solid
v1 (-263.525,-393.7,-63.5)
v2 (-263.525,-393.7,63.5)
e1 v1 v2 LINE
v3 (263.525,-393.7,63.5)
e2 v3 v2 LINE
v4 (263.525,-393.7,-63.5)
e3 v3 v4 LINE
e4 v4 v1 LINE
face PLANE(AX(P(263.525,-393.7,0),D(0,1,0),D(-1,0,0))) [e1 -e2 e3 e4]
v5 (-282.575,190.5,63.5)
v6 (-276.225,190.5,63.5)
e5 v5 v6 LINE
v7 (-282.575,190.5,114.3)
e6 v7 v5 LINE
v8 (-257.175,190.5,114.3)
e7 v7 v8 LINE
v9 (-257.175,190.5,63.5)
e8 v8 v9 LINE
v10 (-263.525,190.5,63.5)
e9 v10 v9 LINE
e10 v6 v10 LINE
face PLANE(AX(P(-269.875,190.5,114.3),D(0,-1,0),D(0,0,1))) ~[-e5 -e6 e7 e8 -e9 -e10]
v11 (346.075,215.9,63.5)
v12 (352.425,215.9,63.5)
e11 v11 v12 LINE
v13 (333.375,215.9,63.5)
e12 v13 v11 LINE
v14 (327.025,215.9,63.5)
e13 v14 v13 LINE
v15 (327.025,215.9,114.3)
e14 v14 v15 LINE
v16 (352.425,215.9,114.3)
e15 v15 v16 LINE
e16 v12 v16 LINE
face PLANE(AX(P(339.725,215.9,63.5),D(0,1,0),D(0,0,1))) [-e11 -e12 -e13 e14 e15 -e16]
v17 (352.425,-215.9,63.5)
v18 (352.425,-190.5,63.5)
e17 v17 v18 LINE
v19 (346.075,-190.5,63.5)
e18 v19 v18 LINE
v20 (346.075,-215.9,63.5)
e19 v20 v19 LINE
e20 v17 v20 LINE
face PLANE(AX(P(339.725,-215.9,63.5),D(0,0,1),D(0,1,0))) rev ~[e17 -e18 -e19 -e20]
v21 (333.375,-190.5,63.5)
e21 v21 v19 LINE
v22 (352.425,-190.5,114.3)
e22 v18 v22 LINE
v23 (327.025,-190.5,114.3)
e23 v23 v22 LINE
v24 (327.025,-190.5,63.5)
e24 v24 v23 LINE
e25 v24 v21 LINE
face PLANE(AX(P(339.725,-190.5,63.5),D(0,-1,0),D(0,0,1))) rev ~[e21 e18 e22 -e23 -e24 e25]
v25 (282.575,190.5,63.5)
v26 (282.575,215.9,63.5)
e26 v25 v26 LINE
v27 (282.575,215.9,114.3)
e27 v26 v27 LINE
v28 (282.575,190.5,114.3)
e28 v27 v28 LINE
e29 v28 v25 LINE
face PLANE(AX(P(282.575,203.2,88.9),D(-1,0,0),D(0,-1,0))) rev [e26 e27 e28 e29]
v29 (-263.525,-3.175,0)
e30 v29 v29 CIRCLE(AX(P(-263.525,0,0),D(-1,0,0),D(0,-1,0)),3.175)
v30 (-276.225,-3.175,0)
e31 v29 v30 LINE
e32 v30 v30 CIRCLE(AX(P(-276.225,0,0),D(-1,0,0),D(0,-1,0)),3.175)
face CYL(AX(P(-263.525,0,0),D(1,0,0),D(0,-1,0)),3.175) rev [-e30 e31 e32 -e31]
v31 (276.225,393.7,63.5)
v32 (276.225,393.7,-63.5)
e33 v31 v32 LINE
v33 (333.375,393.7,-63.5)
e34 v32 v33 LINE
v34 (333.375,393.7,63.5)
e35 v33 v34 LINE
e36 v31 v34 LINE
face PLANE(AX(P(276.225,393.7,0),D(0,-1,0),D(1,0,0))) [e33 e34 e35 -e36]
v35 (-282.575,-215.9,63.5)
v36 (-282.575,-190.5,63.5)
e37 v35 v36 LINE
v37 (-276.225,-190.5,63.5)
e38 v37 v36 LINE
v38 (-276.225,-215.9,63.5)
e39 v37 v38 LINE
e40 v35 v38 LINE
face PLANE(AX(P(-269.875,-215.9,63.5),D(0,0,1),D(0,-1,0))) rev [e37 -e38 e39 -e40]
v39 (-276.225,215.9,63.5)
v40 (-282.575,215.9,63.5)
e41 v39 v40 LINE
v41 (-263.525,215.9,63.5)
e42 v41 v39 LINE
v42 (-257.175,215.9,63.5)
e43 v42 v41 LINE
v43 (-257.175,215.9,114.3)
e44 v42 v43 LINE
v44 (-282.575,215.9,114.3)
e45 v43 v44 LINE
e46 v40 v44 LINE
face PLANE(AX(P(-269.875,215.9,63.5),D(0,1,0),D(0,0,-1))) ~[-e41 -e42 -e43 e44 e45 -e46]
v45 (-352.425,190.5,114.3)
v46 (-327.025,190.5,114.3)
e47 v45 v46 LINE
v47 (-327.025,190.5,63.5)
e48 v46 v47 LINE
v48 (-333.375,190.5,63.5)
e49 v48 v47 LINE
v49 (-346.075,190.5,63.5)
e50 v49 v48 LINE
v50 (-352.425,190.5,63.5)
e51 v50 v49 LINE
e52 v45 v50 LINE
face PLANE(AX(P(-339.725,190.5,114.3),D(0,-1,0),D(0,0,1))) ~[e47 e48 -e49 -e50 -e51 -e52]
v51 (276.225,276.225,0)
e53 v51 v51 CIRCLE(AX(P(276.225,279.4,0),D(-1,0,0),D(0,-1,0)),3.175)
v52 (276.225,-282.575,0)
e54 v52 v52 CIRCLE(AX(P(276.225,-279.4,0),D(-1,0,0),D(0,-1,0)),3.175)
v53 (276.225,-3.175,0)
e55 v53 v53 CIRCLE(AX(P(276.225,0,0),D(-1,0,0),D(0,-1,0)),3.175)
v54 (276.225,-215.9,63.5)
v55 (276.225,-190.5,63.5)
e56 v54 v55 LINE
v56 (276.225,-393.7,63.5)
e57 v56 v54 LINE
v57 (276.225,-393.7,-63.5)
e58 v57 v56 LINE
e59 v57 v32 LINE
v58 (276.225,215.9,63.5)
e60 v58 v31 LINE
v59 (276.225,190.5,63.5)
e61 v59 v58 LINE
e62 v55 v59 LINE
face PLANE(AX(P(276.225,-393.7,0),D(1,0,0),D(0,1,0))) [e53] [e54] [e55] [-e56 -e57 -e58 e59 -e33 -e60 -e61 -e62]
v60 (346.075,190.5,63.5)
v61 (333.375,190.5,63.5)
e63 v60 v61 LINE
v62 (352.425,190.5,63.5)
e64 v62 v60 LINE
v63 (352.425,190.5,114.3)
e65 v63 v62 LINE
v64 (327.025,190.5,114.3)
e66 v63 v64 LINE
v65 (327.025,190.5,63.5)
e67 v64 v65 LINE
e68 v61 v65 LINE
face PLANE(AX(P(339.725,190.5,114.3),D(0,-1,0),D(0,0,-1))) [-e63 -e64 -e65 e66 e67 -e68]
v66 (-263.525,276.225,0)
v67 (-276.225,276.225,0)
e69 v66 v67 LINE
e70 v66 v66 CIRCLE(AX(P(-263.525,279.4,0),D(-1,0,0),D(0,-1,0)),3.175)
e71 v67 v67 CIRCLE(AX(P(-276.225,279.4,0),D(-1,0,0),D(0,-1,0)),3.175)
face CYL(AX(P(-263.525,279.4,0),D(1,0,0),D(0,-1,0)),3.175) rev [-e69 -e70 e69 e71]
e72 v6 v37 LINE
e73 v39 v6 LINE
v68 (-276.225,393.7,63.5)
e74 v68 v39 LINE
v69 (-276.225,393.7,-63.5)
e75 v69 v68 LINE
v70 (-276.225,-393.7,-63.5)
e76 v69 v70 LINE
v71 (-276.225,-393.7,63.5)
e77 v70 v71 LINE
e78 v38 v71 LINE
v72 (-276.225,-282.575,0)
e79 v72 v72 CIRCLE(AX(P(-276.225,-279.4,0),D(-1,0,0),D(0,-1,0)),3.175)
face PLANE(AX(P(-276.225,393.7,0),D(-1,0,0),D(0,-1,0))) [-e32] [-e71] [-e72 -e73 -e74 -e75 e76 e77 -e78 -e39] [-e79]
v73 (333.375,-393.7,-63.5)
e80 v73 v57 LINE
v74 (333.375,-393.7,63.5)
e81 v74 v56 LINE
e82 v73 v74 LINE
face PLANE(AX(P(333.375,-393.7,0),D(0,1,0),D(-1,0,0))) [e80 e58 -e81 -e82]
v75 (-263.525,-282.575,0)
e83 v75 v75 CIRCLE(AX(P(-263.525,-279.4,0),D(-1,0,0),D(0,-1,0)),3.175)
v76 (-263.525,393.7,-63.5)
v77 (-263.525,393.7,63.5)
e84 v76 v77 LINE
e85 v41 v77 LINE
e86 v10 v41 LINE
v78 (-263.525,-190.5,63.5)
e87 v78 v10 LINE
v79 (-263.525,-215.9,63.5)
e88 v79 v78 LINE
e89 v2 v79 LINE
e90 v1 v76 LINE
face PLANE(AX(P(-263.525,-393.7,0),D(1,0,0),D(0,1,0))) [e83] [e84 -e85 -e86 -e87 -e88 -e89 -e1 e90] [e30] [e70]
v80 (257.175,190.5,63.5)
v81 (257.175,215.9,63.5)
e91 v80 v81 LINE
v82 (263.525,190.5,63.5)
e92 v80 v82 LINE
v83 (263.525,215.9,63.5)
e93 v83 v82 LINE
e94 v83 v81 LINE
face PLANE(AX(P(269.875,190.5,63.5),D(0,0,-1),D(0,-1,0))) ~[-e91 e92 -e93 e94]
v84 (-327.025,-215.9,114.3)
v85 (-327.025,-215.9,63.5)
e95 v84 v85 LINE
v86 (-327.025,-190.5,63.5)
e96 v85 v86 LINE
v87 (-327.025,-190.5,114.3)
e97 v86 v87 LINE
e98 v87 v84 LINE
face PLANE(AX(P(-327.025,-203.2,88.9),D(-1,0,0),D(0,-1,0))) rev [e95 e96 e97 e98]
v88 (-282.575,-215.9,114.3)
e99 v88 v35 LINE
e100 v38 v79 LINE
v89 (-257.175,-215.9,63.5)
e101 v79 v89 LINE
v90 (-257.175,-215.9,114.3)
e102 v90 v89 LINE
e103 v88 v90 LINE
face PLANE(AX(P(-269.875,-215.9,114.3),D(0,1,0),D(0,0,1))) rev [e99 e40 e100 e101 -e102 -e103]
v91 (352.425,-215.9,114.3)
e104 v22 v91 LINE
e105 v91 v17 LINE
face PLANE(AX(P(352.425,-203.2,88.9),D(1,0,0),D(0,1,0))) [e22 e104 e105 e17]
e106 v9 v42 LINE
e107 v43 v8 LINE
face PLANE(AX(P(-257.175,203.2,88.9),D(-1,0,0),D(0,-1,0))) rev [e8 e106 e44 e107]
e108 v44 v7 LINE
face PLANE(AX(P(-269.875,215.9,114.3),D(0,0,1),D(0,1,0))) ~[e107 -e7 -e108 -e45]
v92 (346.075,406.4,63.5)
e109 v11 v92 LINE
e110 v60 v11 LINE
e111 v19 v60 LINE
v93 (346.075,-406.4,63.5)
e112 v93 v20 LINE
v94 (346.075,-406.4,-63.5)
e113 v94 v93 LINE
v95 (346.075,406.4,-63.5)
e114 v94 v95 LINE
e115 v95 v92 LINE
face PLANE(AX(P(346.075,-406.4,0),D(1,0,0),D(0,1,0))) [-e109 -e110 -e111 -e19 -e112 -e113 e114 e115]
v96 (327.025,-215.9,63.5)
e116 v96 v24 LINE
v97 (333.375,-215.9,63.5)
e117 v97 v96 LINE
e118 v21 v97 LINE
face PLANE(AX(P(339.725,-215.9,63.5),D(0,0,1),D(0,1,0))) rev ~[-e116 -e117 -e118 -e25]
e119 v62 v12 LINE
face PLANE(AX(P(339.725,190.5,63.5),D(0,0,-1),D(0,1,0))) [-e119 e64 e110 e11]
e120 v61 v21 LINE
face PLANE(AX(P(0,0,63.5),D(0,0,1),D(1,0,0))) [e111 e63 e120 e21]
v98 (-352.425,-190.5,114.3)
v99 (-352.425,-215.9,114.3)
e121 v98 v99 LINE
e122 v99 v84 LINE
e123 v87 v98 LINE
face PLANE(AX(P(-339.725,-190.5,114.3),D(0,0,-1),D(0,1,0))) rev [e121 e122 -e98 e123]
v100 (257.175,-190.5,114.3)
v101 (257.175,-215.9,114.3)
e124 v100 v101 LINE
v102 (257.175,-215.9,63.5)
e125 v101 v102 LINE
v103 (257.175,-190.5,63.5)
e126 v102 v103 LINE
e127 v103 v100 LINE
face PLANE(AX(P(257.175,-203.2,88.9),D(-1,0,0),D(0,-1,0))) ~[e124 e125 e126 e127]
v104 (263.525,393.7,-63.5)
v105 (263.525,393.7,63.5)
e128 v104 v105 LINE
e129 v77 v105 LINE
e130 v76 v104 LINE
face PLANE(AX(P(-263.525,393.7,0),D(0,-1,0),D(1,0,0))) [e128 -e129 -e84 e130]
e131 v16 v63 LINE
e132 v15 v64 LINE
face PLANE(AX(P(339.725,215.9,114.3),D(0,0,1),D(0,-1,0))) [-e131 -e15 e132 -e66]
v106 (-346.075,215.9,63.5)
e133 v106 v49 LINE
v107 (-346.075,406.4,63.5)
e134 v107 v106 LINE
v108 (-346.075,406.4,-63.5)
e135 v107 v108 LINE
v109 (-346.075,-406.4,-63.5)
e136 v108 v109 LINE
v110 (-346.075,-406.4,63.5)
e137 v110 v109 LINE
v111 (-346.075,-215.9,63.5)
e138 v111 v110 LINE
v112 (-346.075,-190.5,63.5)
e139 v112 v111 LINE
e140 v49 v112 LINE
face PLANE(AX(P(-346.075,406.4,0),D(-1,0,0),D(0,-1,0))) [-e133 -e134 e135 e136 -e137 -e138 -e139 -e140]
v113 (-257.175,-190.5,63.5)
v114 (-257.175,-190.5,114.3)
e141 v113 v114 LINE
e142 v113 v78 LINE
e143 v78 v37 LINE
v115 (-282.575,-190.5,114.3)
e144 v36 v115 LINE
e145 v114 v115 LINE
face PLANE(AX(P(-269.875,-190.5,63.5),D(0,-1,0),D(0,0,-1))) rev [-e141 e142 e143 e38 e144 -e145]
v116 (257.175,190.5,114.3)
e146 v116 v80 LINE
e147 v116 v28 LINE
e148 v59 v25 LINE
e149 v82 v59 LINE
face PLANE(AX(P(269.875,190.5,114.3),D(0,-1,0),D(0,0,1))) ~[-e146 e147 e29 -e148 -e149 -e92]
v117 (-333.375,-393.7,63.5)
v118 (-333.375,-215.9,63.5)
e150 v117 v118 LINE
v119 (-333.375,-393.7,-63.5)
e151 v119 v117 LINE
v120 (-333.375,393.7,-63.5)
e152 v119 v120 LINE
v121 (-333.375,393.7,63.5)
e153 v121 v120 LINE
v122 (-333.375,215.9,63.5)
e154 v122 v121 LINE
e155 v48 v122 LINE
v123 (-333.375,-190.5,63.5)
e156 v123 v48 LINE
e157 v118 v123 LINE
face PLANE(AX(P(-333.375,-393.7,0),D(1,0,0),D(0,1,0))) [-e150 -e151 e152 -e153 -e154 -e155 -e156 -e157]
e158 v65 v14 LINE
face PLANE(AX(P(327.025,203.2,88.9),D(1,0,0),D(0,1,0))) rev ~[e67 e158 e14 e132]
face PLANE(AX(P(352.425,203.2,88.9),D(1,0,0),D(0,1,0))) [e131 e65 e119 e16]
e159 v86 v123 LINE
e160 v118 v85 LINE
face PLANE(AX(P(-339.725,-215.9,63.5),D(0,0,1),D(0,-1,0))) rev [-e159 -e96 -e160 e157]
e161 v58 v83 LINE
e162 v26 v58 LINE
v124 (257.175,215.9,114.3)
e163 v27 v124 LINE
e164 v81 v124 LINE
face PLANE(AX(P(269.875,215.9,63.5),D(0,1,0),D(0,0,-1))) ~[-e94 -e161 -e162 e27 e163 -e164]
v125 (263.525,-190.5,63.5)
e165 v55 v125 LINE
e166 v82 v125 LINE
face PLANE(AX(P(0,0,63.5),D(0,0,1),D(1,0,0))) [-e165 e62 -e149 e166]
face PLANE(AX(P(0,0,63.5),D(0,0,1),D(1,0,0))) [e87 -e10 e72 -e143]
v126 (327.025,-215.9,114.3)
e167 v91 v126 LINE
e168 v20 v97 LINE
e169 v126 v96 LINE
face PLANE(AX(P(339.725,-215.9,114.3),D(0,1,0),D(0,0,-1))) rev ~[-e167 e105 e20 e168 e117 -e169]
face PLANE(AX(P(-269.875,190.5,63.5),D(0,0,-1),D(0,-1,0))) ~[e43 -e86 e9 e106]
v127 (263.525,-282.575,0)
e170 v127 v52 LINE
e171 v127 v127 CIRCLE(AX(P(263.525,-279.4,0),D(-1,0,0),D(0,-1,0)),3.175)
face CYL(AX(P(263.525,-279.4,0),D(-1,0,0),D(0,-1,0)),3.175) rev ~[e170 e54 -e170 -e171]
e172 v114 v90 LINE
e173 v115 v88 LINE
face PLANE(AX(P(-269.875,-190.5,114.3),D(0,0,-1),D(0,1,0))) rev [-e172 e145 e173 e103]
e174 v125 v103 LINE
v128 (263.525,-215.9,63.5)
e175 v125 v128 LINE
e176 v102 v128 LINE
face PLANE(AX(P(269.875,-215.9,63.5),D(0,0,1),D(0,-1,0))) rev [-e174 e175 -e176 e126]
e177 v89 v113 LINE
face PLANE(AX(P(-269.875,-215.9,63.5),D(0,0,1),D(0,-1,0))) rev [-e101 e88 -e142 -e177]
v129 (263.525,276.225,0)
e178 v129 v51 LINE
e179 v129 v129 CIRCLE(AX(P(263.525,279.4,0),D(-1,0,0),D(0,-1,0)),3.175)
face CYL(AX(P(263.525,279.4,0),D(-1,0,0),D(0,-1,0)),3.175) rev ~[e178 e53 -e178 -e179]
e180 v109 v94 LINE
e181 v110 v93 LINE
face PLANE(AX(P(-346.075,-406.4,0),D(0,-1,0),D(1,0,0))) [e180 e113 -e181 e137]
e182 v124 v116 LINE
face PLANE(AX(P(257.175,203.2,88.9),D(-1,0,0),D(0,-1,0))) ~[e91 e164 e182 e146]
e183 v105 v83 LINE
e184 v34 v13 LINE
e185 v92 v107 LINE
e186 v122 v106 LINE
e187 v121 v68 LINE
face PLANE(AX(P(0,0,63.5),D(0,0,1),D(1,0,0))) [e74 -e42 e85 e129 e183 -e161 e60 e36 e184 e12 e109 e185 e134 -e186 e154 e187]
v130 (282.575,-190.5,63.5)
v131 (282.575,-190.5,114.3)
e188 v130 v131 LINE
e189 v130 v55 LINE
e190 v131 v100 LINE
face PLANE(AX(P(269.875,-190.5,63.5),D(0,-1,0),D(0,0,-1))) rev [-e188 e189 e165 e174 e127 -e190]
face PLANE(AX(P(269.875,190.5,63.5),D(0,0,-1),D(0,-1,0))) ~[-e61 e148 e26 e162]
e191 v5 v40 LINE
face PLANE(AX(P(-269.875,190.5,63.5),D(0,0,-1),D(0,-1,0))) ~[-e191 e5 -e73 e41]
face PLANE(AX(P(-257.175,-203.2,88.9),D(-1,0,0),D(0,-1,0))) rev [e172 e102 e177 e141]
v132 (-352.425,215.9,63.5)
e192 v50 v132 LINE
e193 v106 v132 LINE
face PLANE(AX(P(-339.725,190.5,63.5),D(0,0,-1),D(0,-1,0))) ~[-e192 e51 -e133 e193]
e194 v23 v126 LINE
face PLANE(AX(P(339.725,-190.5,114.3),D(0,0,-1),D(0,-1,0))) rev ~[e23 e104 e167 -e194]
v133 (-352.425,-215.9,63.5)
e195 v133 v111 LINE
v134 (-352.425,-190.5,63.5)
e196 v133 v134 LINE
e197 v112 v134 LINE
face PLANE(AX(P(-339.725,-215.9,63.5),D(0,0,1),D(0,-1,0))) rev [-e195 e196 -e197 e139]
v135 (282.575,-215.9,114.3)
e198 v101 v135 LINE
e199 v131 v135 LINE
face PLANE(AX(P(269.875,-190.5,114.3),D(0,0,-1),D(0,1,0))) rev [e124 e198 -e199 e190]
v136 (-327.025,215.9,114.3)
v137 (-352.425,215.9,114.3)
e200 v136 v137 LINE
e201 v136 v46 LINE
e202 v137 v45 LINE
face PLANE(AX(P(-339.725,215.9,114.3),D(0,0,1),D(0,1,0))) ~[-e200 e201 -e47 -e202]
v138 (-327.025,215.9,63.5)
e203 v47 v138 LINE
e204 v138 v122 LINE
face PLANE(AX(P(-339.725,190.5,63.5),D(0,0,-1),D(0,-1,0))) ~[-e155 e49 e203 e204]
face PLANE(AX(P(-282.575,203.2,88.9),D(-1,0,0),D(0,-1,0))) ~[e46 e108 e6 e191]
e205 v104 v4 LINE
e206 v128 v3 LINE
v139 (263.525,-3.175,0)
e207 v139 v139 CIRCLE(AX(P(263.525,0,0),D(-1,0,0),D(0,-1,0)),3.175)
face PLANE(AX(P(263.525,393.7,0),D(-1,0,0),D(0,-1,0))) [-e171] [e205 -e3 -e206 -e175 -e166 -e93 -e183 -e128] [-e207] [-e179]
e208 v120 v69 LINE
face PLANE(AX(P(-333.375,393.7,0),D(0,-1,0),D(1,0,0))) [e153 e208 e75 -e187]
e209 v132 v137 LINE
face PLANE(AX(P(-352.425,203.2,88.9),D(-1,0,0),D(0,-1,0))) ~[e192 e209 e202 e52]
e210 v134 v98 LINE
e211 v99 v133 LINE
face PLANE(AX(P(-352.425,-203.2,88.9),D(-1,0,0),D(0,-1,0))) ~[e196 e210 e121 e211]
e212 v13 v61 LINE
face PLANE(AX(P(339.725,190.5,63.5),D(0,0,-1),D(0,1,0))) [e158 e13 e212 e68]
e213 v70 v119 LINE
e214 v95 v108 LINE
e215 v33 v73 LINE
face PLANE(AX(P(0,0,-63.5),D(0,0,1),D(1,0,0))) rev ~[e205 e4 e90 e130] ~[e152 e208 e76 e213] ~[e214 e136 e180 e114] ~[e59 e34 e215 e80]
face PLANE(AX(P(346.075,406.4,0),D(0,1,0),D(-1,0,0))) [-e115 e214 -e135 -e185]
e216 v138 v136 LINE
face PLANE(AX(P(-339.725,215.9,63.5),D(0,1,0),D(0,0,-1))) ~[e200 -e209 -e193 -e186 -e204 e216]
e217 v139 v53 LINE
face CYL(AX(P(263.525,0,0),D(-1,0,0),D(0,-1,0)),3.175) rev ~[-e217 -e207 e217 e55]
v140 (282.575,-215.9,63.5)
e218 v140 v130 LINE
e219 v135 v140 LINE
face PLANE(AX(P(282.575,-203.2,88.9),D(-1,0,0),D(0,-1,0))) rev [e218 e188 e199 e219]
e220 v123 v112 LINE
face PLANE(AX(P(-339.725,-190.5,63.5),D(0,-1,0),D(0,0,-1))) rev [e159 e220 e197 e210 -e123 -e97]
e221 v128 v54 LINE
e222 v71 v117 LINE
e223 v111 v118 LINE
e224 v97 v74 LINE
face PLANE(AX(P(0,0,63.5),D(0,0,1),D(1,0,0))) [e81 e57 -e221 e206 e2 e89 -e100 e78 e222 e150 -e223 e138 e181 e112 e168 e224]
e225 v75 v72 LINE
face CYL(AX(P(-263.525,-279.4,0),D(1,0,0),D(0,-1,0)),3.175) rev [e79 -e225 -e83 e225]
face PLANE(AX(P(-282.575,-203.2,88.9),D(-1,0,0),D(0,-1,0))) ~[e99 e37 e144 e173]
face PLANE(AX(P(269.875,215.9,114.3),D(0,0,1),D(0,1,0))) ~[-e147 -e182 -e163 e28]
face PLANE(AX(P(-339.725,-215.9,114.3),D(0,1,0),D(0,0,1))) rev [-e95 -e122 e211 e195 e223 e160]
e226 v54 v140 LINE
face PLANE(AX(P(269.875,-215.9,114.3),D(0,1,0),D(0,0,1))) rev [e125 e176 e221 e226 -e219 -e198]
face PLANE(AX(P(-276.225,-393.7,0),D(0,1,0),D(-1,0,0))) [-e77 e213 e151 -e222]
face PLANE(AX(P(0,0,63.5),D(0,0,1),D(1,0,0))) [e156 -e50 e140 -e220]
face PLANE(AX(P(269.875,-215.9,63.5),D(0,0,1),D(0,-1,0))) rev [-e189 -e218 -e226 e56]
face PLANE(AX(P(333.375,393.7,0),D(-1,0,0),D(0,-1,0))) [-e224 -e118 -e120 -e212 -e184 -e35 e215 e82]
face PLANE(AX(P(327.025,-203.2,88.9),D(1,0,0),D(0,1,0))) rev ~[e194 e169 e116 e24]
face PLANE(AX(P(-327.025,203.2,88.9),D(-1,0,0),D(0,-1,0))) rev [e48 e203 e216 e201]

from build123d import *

# Parameters (mm, degrees)
F1_DEPTH = 63.5
F2_R     = 3.175
F3_DEPTH = 12.7
F6_DEPTH = 12.7


# Not quite as in the source:
# - a pattern or mirror of a feature is missing from the dataset's text; its kind, count and spacing are read off the source's solid


with BuildPart() as f1:
    # F0 (on Top) → F1 (new body, symmetric)
    with BuildSketch(Plane.XY):
        Polygon((-346.075, -406.4), (346.075, -406.4), (346.075, -393.7), (346.075, 406.4), (-290.28644, 406.4), (-294.2266940207, 406.4), (-346.075, 406.4), (-346.075, 393.7), align=None)
        Polygon((-276.225, 393.7), (-276.225, 383.1179738045), (-276.225, -393.7), (-333.375, -393.7), (-333.375, 393.7), align=None, mode=Mode.SUBTRACT)
        Polygon((-263.525, -393.7), (-263.525, 383.1179738045), (-263.525, 393.7), (263.525, 393.7), (263.525, 383.1179738045), (263.525, -393.7), align=None, mode=Mode.SUBTRACT)
        Polygon((333.375, 393.7), (333.375, -393.7), (276.225, -393.7), (276.225, 383.1179738045), (276.225, 393.7), align=None, mode=Mode.SUBTRACT)
    extrude(amount=F1_DEPTH, both=True)

    # F2 (on face) → F3 (cut)
    with BuildSketch(Plane(origin=(263.525, 0, 0), x_dir=(0, -1, 0), z_dir=(-1, 0, 0))):
        Circle(F2_R)
        with Locations((-279.4, 0)):
            Circle(F2_R)
        with Locations((279.4, 0)):
            Circle(F2_R)
    f3 = extrude(amount=-F3_DEPTH, mode=Mode.SUBTRACT)

    # F3_copies: F3 across plane
    add(f3.mirror(Plane(origin=(0, 0, 0), x_dir=(0, 0, -1), z_dir=(-1, 0, 0))), mode=Mode.SUBTRACT)

    # F5 (on mid) → F6 (join, symmetric)
    with BuildSketch(Plane.YZ.offset(339.725)):
        Polygon((-215.9, 63.5), (-203.2, 63.5), (-190.5, 63.5), (-190.5, 114.3), (-215.9, 114.3), align=None)
        Polygon((190.5, 63.5), (203.2, 63.5), (215.9, 63.5), (215.9, 114.3), (190.5, 114.3), align=None)
    f6 = extrude(amount=F6_DEPTH, both=True)

    # F6_copies: F6 across plane
    add(f6.mirror(Plane(origin=(0, 0, 0), x_dir=(0, 0, -1), z_dir=(-1, 0, 0))))

    # F6_copies1: F6 across plane
    add(f6.mirror(Plane(origin=(304.8, 0, 0), x_dir=(0, 0, -1), z_dir=(-1, 0, 0))))

    # F6_copies2: F6 across plane
    add(f6.mirror(Plane(origin=(34.925, 0, 0), x_dir=(0, 0, -1), z_dir=(-1, 0, 0))))


solid = f1.part
